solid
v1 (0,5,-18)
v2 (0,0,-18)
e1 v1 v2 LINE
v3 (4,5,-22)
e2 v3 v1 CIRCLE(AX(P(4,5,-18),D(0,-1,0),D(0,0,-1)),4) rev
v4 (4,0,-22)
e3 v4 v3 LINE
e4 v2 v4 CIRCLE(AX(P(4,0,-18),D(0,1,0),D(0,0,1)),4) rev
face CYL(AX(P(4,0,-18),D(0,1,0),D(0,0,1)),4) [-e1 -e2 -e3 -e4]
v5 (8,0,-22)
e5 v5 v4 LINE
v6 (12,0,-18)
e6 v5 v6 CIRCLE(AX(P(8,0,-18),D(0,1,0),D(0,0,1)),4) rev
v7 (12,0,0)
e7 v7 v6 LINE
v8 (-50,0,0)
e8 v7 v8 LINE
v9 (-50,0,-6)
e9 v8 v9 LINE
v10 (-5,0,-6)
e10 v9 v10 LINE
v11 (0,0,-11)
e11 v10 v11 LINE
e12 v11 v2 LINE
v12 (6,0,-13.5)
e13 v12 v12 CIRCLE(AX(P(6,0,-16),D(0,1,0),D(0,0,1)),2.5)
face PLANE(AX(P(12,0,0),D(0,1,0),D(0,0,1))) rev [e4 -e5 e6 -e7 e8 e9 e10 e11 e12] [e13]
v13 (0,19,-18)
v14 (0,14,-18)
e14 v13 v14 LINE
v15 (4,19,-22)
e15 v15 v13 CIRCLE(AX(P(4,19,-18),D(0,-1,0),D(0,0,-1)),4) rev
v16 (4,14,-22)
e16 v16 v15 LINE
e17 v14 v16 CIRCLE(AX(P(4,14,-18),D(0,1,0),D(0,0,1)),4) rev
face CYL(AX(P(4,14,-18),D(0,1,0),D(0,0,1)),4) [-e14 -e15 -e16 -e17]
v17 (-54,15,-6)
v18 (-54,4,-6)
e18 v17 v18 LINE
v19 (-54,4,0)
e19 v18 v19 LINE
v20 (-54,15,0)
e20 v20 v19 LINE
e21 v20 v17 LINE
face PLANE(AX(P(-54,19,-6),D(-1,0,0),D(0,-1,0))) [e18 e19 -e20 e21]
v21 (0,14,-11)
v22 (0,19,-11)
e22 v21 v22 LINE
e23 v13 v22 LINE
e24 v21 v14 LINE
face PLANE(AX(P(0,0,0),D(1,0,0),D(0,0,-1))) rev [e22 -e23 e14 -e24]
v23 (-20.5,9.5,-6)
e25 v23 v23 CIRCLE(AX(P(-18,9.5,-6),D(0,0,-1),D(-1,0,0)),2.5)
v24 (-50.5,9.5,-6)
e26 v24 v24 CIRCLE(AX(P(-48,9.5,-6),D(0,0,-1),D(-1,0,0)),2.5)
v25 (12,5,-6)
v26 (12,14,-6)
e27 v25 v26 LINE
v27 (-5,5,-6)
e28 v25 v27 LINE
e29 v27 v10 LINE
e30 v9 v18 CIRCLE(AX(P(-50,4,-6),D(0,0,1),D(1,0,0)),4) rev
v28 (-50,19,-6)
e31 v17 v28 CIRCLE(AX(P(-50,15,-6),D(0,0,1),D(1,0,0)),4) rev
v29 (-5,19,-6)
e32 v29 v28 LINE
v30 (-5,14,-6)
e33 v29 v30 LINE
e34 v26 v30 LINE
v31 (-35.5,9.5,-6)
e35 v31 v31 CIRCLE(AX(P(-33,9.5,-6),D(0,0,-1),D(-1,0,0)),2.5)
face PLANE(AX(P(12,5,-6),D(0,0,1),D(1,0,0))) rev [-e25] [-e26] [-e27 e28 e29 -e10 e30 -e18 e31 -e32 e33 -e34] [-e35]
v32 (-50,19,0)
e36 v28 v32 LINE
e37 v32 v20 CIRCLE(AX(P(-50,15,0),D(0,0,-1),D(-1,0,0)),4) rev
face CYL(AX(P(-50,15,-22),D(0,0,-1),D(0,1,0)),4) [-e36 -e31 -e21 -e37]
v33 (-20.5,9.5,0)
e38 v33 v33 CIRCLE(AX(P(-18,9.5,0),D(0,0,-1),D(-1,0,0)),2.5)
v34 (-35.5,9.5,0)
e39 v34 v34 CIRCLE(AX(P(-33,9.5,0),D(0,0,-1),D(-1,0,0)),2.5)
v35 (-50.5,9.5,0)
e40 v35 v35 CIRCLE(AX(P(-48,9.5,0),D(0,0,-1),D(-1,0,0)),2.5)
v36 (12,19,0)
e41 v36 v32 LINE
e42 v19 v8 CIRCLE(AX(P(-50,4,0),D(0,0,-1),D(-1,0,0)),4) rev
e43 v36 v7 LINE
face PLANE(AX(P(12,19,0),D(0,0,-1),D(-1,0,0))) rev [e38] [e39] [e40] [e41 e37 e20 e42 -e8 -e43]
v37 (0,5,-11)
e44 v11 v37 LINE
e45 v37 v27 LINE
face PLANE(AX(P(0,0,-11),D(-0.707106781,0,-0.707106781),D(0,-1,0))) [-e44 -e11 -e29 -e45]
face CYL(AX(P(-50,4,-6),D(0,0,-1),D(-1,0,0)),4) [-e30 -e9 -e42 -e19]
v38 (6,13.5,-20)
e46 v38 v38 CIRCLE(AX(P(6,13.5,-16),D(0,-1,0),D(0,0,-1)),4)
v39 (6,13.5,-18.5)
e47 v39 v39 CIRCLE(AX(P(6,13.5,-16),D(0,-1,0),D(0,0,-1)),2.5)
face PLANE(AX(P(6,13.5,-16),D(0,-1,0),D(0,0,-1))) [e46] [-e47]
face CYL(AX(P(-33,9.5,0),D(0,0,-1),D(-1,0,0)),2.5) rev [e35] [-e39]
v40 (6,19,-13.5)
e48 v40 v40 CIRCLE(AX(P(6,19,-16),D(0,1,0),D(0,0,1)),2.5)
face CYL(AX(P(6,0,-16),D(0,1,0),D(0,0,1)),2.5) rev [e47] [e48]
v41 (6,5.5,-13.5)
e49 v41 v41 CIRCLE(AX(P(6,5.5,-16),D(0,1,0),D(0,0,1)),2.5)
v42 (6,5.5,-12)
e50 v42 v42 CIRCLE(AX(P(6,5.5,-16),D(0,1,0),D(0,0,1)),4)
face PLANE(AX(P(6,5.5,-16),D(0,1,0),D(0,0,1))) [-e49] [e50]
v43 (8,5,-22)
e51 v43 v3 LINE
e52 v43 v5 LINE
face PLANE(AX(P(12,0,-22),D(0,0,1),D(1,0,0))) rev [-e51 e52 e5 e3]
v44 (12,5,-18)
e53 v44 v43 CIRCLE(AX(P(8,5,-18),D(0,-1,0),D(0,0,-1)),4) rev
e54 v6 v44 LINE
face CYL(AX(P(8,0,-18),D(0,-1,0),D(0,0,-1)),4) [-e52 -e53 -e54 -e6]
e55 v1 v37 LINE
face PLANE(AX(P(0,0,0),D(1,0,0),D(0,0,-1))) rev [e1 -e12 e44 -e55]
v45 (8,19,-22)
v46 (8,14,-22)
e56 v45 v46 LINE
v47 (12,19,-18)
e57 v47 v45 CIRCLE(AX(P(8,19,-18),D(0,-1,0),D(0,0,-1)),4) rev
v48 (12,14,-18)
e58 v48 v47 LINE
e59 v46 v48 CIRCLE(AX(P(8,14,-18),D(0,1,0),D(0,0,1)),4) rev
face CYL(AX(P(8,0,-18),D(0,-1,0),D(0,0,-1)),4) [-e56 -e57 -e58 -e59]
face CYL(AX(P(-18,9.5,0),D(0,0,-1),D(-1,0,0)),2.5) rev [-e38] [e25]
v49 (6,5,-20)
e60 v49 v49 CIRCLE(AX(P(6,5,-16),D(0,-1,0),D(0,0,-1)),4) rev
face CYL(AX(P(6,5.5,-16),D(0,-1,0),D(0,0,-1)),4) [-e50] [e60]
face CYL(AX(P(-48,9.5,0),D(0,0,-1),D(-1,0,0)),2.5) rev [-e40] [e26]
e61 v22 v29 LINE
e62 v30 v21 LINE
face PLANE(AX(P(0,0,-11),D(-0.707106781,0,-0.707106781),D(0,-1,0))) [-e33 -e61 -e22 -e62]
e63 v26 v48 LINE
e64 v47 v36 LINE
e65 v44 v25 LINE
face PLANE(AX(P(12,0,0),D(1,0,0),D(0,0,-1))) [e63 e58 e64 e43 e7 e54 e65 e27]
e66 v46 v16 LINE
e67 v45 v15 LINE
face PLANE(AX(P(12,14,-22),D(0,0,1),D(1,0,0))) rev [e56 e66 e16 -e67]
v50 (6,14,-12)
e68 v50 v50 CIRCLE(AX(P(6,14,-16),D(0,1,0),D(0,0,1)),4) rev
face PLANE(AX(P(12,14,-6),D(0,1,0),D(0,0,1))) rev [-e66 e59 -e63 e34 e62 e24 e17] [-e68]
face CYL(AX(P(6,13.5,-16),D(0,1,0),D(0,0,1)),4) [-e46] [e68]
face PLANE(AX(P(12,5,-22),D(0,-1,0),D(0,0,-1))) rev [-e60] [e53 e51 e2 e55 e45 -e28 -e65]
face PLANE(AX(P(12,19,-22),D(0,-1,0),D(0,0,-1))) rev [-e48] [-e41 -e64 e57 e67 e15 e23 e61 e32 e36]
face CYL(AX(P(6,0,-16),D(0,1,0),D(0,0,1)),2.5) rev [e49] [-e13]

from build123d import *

# Parameters (mm, degrees)
EXTRUDE_1_DEPTH     = 12
SKETCH_2_R          = 2.5
CUT_EXTRUDE_1_DEPTH = 32.448370387
SKETCH_3_R          = 4
SKETCH_3_R_2        = 2.5
EXTRUDE_2_DEPTH     = 0.5
EXTRUDE_START       = 0.5
SKETCH_4_R          = 4
SKETCH_4_R_2        = 2.5
EXTRUDE_3_DEPTH     = 0.5
FILLET_1_R          = 4
EXTRUDE_START_2     = -6
SKETCH_5_W          = 54
SKETCH_5_H          = 19
EXTRUDE_4_DEPTH     = 6
CHAMFER_1_SIZE      = 5
SKETCH_6_R          = 2.5
CUT_EXTRUDE_2_DEPTH = 60.439044407
FILLET_2_R          = 4


with BuildPart() as part:
    # Эскиз1 → Бобышка-Вытянуть1 (new body)
    with BuildSketch(Plane(origin=(0, 0, 0), x_dir=(0, 0, -1), z_dir=(1, 0, 0))):
        Polygon((0, 0), (22, 0), (22, 5), (6, 5), (6, 14), (22, 14), (22, 19), (0, 19), align=None)
    extrude(amount=EXTRUDE_1_DEPTH)

    # Эскиз2 → Вырез-Вытянуть1 (cut, through all)
    with BuildSketch(Plane(origin=(0, 19, 0), x_dir=(1, 0, 0), z_dir=(0, 1, 0))):
        with Locations(Location((6, 16, 0), (0, 0, 270))):
            Circle(SKETCH_2_R)
    extrude(amount=-CUT_EXTRUDE_1_DEPTH, mode=Mode.SUBTRACT)

    # Эскиз3 → Бобышка-Вытянуть2 (add)
    with BuildSketch(Plane.XZ.offset(-14)):
        with Locations(Location((6, -16, 0), (0, 0, 90))):
            Circle(SKETCH_3_R)
        with Locations(Location((6, -16, 0), (0, 0, 90))):
            Circle(SKETCH_3_R_2, mode=Mode.SUBTRACT)
    extrude(amount=EXTRUDE_2_DEPTH)

    # Эскиз4 → Бобышка-Вытянуть3 (add)
    with BuildSketch(Plane(origin=(0, 5, 0), x_dir=(1, 0, 0), z_dir=(0, 1, 0)).offset(EXTRUDE_START)):
        with Locations(Location((6, 16, 0), (0, 0, 270))):
            Circle(SKETCH_4_R)
        with Locations(Location((6, 16, 0), (0, 0, 270))):
            Circle(SKETCH_4_R_2, mode=Mode.SUBTRACT)
    extrude(amount=-EXTRUDE_3_DEPTH)

    # Скругление1
    fillet_1_edges = [part.edges().sort_by_distance(p)[0] for p in [
        (12, 2.5, -22),
        (12, 16.5, -22),
        (0, 16.5, -22),
        (0, 2.5, -22),
    ]]
    fillet(fillet_1_edges, radius=FILLET_1_R)

    # Эскиз5 → Бобышка-Вытянуть4 (add)
    with BuildSketch(Plane.XY.offset(EXTRUDE_START_2)):
        with Locations((-27, 9.5)):
            Rectangle(SKETCH_5_W, SKETCH_5_H)
    extrude(amount=EXTRUDE_4_DEPTH)

    # Фаска1
    chamfer_1_edges = [part.edges().sort_by_distance(p)[0] for p in [
        (0, 16.5, -6),
        (0, 2.5, -6),
    ]]
    chamfer(chamfer_1_edges, length=CHAMFER_1_SIZE)

    # Эскиз6 → Вырез-Вытянуть2 (cut, through all)
    with BuildSketch(Plane(origin=(0, 0, -6), x_dir=(-1, 0, 0), z_dir=(0, 0, -1))):
        with Locations((48, 9.5)):
            Circle(SKETCH_6_R)
        with Locations((33, 9.5)):
            Circle(SKETCH_6_R)
        with Locations((18, 9.5)):
            Circle(SKETCH_6_R)
    extrude(amount=-CUT_EXTRUDE_2_DEPTH, mode=Mode.SUBTRACT)

    # Скругление2
    fillet_2_edges = [part.edges().sort_by_distance(p)[0] for p in [
        (-54, 0, -3),
        (-54, 19, -3),
    ]]
    fillet(fillet_2_edges, radius=FILLET_2_R)


solid = part.part
